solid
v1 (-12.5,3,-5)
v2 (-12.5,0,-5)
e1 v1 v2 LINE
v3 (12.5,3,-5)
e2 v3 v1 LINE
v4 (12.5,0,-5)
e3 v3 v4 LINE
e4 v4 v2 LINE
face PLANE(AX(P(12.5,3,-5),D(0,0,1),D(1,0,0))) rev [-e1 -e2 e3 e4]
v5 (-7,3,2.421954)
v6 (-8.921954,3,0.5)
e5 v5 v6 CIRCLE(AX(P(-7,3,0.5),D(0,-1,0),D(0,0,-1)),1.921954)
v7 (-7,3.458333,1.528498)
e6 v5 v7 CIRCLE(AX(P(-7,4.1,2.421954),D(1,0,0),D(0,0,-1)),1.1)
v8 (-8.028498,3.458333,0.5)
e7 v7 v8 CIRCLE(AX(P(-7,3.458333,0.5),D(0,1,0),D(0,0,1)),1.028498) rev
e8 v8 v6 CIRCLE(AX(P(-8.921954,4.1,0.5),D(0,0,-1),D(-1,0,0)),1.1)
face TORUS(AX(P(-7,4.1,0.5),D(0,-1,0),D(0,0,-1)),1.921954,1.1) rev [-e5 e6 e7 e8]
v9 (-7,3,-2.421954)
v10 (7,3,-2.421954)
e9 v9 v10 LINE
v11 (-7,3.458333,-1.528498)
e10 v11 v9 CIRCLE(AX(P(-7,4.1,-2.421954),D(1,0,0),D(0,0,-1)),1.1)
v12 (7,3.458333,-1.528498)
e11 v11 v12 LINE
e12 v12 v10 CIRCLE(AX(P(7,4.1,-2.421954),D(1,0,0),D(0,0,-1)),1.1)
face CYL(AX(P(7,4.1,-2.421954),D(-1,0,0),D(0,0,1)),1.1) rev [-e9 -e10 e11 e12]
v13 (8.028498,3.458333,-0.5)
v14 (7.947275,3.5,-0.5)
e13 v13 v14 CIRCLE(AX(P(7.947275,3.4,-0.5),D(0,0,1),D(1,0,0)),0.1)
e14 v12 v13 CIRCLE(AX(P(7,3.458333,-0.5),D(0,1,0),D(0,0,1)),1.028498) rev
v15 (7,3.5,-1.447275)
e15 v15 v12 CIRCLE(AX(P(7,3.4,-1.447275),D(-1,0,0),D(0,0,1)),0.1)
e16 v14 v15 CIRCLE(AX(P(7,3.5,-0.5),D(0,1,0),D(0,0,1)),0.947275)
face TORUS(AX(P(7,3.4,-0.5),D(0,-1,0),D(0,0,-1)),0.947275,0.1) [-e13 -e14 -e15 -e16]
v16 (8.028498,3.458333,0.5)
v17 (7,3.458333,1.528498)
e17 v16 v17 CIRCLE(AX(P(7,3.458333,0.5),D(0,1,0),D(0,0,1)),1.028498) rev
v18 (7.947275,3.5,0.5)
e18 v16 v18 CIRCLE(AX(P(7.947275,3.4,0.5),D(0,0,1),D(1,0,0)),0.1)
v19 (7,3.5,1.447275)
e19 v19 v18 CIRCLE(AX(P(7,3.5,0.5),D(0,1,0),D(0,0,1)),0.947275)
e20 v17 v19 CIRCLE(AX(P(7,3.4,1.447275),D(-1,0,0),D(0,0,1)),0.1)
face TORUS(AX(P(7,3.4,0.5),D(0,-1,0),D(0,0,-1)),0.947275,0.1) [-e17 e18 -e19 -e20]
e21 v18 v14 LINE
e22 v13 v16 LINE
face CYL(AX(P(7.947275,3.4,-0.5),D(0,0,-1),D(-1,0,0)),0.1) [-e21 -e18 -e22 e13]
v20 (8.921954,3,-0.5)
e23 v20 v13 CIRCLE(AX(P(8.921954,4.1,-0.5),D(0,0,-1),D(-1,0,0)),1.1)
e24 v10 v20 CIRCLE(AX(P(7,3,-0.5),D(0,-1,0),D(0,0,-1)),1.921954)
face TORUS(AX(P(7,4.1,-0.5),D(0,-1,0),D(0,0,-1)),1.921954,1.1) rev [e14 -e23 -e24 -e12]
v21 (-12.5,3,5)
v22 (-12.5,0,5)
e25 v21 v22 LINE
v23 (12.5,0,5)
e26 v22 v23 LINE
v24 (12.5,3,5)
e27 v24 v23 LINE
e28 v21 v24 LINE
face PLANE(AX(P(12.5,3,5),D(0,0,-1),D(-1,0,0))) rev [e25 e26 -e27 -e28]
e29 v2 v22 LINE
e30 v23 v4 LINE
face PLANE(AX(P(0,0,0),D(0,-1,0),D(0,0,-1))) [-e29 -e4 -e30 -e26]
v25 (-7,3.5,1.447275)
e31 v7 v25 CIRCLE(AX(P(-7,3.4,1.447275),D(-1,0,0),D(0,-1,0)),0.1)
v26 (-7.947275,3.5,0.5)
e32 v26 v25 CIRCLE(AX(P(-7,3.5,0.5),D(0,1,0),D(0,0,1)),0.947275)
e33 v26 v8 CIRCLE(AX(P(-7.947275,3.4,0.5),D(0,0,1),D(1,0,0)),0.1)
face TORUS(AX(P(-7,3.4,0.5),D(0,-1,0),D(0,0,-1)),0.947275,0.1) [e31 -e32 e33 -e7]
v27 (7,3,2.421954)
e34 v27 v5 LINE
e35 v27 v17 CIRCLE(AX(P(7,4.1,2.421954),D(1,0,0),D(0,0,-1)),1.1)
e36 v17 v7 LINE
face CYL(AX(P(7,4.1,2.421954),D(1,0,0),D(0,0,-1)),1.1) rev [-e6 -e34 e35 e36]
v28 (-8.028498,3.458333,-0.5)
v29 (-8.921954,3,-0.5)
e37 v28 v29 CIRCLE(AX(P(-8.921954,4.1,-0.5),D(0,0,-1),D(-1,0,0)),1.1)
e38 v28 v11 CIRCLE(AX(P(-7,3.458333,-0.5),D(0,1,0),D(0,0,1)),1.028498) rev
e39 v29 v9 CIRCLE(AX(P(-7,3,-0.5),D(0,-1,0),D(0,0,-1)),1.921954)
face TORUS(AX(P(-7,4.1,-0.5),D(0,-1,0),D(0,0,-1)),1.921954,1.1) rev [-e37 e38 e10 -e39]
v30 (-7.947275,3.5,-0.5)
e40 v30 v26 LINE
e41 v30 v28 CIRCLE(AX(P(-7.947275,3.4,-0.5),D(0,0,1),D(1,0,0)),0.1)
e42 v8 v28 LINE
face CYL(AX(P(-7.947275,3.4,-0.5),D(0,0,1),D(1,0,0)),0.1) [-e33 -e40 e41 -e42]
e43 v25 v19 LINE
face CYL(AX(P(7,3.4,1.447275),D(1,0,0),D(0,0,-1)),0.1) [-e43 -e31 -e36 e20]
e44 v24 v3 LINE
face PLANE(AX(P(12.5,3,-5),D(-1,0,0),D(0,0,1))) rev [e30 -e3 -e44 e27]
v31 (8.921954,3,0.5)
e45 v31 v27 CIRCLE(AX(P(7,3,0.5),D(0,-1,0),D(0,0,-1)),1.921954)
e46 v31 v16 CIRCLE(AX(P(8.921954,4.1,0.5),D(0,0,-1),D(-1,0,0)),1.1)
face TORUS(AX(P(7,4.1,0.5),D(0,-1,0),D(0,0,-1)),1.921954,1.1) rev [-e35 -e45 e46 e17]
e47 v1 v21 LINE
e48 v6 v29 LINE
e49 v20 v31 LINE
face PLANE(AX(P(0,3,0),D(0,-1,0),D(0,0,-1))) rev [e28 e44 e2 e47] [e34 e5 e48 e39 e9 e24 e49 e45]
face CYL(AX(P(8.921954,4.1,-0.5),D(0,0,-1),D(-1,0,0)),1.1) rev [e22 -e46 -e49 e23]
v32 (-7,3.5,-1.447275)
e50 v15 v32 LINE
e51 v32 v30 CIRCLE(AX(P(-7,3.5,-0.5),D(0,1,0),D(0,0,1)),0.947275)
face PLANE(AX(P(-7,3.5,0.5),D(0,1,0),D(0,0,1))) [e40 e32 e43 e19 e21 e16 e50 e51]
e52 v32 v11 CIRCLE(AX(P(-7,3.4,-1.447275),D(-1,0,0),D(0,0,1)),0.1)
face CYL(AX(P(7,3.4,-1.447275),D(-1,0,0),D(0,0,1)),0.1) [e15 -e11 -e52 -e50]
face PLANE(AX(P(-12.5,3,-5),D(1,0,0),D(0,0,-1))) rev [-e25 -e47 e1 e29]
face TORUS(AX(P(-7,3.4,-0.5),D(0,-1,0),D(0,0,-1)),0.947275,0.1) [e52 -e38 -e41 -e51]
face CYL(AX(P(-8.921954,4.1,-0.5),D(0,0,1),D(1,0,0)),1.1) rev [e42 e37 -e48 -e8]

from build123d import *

# Parameters (mm, degrees)
SKETCH_1_W      = 25
SKETCH_1_H      = 10
EXTRUDE_1_DEPTH = 3
EXTRUDE_2_DEPTH = 0.5
FILLET_1_R      = 1.1
FILLET_2_R      = 0.1


with BuildPart() as part:
    # 草图1 → 凸台-拉伸1 (new body)
    with BuildSketch(Plane(origin=(0, 0, 0), x_dir=(1, 0, 0), z_dir=(0, 1, 0))):
        Rectangle(SKETCH_1_W, SKETCH_1_H)
    extrude(amount=EXTRUDE_1_DEPTH)

    # 草图2 → 凸台-拉伸2 (add)
    with BuildSketch(Plane(origin=(0, 3, 0), x_dir=(1, 0, 0), z_dir=(0, 1, 0))):
        with BuildLine():
            Line((7, 1.5), (-7, 1.5))
            ThreePointArc((-7, 1.5), (-7.707106781, 1.207106781), (-8, 0.5))
            Line((-8, 0.5), (-8, -0.5))
            ThreePointArc((-8, -0.5), (-7.707106781, -1.207106781), (-7, -1.5))
            Line((-7, -1.5), (7, -1.5))
            ThreePointArc((7, -1.5), (7.707106781, -1.207106781), (8, -0.5))
            Line((8, -0.5), (8, 0.5))
            ThreePointArc((8, 0.5), (7.707106781, 1.207106781), (7, 1.5))
        make_face()
    extrude(amount=EXTRUDE_2_DEPTH)

    # 圆角1
    # the kernel refuses this fillet: 1.1 mm, written as the material it adds along each edge
    with BuildSketch(Plane(origin=(-7, 3, 0.5), x_dir=(-1, 0, 0), z_dir=(0, 0, -1))) as fillet_1_piece_1:
        with BuildLine():
            CenterArc((1.921954446, 1.1), FILLET_1_R, 213.055731151, 56.944268849)
            Line((1, 0.5), (0.981560911, 0.488))
            ThreePointArc((0.981560911, 0.488), (0.978, 0.25), (0.978, 0))
            Line((0.978, 0), (1, -0.022))
            Line((1, -0.022), (1.921954446, -0.022))
            Line((1.921954446, -0.022), (1.921954446, 0))
        make_face()
    revolve(axis=Axis((-7, 3, 0.5), (0, 1, 0)), revolution_arc=90)
    with BuildSketch(Plane(origin=(-8, 3, -0.5), x_dir=(-1, 0, 0), z_dir=(0, 0, 1)), Plane(origin=(8, 3, 0.5), x_dir=(1, 0, 0), z_dir=(0, 0, -1))) as fillet_1_piece_2:
        with BuildLine():
            CenterArc((0.921954446, -1.1), FILLET_1_R, 90, 56.944268849)
            Line((0, -0.5), (-0.018439089, -0.488))
            ThreePointArc((-0.018439089, -0.488), (-0.022, -0.25), (-0.022, 0))
            Line((-0.022, 0), (0, 0.022))
            Line((0, 0.022), (0.921954446, 0.022))
            Line((0.921954446, 0.022), (0.921954446, 0))
        make_face()
    extrude(amount=1)
    with BuildSketch(Plane(origin=(-7, 3, -0.5), x_dir=(0, 0, -1), z_dir=(1, 0, 0))) as fillet_1_piece_3:
        with BuildLine():
            CenterArc((1.921954446, 1.1), FILLET_1_R, 213.055731151, 56.944268849)
            Line((1, 0.5), (0.981560911, 0.488))
            ThreePointArc((0.981560911, 0.488), (0.978, 0.25), (0.978, 0))
            Line((0.978, 0), (1, -0.022))
            Line((1, -0.022), (1.921954446, -0.022))
            Line((1.921954446, -0.022), (1.921954446, 0))
        make_face()
    revolve(axis=Axis((-7, 3, -0.5), (0, 1, 0)), revolution_arc=90)
    with BuildSketch(Plane(origin=(7, 3, -1.5), x_dir=(0, 0, -1), z_dir=(-1, 0, 0)), Plane(origin=(-7, 3, 1.5), x_dir=(0, 0, 1), z_dir=(1, 0, 0))) as fillet_1_piece_4:
        with BuildLine():
            CenterArc((0.921954446, -1.1), FILLET_1_R, 90, 56.944268849)
            Line((0, -0.5), (-0.018439089, -0.488))
            ThreePointArc((-0.018439089, -0.488), (-0.022, -0.25), (-0.022, 0))
            Line((-0.022, 0), (0, 0.022))
            Line((0, 0.022), (0.921954446, 0.022))
            Line((0.921954446, 0.022), (0.921954446, 0))
        make_face()
    extrude(amount=14)
    with BuildSketch(Plane(origin=(7, 3, -0.5), x_dir=(1, 0, 0), z_dir=(0, 0, 1))) as fillet_1_piece_5:
        with BuildLine():
            CenterArc((1.921954446, 1.1), FILLET_1_R, 213.055731151, 56.944268849)
            Line((1, 0.5), (0.981560911, 0.488))
            ThreePointArc((0.981560911, 0.488), (0.978, 0.25), (0.978, 0))
            Line((0.978, 0), (1, -0.022))
            Line((1, -0.022), (1.921954446, -0.022))
            Line((1.921954446, -0.022), (1.921954446, 0))
        make_face()
    revolve(axis=Axis((7, 3, -0.5), (0, 1, 0)), revolution_arc=90)
    with BuildSketch(Plane(origin=(7, 3, 0.5), x_dir=(0, 0, 1), z_dir=(-1, 0, 0))) as fillet_1_piece_6:
        with BuildLine():
            CenterArc((1.921954446, 1.1), FILLET_1_R, 213.055731151, 56.944268849)
            Line((1, 0.5), (0.981560911, 0.488))
            ThreePointArc((0.981560911, 0.488), (0.978, 0.25), (0.978, 0))
            Line((0.978, 0), (1, -0.022))
            Line((1, -0.022), (1.921954446, -0.022))
            Line((1.921954446, -0.022), (1.921954446, 0))
        make_face()
    revolve(axis=Axis((7, 3, 0.5), (0, 1, 0)), revolution_arc=90)

    # 圆角2
    fillet_2_edges = [part.edges().sort_by_distance(p)[0] for p in [
        (-7.707106781, 3.5, 1.207106781),
        (0, 3.5, 1.5),
        (7.707106781, 3.5, 1.207106781),
        (8, 3.5, 0),
        (7.707106781, 3.5, -1.207106781),
        (0, 3.5, -1.5),
        (-7.707106781, 3.5, -1.207106781),
        (-8, 3.5, 0),
    ]]
    fillet(fillet_2_edges, radius=FILLET_2_R)


solid = part.part
